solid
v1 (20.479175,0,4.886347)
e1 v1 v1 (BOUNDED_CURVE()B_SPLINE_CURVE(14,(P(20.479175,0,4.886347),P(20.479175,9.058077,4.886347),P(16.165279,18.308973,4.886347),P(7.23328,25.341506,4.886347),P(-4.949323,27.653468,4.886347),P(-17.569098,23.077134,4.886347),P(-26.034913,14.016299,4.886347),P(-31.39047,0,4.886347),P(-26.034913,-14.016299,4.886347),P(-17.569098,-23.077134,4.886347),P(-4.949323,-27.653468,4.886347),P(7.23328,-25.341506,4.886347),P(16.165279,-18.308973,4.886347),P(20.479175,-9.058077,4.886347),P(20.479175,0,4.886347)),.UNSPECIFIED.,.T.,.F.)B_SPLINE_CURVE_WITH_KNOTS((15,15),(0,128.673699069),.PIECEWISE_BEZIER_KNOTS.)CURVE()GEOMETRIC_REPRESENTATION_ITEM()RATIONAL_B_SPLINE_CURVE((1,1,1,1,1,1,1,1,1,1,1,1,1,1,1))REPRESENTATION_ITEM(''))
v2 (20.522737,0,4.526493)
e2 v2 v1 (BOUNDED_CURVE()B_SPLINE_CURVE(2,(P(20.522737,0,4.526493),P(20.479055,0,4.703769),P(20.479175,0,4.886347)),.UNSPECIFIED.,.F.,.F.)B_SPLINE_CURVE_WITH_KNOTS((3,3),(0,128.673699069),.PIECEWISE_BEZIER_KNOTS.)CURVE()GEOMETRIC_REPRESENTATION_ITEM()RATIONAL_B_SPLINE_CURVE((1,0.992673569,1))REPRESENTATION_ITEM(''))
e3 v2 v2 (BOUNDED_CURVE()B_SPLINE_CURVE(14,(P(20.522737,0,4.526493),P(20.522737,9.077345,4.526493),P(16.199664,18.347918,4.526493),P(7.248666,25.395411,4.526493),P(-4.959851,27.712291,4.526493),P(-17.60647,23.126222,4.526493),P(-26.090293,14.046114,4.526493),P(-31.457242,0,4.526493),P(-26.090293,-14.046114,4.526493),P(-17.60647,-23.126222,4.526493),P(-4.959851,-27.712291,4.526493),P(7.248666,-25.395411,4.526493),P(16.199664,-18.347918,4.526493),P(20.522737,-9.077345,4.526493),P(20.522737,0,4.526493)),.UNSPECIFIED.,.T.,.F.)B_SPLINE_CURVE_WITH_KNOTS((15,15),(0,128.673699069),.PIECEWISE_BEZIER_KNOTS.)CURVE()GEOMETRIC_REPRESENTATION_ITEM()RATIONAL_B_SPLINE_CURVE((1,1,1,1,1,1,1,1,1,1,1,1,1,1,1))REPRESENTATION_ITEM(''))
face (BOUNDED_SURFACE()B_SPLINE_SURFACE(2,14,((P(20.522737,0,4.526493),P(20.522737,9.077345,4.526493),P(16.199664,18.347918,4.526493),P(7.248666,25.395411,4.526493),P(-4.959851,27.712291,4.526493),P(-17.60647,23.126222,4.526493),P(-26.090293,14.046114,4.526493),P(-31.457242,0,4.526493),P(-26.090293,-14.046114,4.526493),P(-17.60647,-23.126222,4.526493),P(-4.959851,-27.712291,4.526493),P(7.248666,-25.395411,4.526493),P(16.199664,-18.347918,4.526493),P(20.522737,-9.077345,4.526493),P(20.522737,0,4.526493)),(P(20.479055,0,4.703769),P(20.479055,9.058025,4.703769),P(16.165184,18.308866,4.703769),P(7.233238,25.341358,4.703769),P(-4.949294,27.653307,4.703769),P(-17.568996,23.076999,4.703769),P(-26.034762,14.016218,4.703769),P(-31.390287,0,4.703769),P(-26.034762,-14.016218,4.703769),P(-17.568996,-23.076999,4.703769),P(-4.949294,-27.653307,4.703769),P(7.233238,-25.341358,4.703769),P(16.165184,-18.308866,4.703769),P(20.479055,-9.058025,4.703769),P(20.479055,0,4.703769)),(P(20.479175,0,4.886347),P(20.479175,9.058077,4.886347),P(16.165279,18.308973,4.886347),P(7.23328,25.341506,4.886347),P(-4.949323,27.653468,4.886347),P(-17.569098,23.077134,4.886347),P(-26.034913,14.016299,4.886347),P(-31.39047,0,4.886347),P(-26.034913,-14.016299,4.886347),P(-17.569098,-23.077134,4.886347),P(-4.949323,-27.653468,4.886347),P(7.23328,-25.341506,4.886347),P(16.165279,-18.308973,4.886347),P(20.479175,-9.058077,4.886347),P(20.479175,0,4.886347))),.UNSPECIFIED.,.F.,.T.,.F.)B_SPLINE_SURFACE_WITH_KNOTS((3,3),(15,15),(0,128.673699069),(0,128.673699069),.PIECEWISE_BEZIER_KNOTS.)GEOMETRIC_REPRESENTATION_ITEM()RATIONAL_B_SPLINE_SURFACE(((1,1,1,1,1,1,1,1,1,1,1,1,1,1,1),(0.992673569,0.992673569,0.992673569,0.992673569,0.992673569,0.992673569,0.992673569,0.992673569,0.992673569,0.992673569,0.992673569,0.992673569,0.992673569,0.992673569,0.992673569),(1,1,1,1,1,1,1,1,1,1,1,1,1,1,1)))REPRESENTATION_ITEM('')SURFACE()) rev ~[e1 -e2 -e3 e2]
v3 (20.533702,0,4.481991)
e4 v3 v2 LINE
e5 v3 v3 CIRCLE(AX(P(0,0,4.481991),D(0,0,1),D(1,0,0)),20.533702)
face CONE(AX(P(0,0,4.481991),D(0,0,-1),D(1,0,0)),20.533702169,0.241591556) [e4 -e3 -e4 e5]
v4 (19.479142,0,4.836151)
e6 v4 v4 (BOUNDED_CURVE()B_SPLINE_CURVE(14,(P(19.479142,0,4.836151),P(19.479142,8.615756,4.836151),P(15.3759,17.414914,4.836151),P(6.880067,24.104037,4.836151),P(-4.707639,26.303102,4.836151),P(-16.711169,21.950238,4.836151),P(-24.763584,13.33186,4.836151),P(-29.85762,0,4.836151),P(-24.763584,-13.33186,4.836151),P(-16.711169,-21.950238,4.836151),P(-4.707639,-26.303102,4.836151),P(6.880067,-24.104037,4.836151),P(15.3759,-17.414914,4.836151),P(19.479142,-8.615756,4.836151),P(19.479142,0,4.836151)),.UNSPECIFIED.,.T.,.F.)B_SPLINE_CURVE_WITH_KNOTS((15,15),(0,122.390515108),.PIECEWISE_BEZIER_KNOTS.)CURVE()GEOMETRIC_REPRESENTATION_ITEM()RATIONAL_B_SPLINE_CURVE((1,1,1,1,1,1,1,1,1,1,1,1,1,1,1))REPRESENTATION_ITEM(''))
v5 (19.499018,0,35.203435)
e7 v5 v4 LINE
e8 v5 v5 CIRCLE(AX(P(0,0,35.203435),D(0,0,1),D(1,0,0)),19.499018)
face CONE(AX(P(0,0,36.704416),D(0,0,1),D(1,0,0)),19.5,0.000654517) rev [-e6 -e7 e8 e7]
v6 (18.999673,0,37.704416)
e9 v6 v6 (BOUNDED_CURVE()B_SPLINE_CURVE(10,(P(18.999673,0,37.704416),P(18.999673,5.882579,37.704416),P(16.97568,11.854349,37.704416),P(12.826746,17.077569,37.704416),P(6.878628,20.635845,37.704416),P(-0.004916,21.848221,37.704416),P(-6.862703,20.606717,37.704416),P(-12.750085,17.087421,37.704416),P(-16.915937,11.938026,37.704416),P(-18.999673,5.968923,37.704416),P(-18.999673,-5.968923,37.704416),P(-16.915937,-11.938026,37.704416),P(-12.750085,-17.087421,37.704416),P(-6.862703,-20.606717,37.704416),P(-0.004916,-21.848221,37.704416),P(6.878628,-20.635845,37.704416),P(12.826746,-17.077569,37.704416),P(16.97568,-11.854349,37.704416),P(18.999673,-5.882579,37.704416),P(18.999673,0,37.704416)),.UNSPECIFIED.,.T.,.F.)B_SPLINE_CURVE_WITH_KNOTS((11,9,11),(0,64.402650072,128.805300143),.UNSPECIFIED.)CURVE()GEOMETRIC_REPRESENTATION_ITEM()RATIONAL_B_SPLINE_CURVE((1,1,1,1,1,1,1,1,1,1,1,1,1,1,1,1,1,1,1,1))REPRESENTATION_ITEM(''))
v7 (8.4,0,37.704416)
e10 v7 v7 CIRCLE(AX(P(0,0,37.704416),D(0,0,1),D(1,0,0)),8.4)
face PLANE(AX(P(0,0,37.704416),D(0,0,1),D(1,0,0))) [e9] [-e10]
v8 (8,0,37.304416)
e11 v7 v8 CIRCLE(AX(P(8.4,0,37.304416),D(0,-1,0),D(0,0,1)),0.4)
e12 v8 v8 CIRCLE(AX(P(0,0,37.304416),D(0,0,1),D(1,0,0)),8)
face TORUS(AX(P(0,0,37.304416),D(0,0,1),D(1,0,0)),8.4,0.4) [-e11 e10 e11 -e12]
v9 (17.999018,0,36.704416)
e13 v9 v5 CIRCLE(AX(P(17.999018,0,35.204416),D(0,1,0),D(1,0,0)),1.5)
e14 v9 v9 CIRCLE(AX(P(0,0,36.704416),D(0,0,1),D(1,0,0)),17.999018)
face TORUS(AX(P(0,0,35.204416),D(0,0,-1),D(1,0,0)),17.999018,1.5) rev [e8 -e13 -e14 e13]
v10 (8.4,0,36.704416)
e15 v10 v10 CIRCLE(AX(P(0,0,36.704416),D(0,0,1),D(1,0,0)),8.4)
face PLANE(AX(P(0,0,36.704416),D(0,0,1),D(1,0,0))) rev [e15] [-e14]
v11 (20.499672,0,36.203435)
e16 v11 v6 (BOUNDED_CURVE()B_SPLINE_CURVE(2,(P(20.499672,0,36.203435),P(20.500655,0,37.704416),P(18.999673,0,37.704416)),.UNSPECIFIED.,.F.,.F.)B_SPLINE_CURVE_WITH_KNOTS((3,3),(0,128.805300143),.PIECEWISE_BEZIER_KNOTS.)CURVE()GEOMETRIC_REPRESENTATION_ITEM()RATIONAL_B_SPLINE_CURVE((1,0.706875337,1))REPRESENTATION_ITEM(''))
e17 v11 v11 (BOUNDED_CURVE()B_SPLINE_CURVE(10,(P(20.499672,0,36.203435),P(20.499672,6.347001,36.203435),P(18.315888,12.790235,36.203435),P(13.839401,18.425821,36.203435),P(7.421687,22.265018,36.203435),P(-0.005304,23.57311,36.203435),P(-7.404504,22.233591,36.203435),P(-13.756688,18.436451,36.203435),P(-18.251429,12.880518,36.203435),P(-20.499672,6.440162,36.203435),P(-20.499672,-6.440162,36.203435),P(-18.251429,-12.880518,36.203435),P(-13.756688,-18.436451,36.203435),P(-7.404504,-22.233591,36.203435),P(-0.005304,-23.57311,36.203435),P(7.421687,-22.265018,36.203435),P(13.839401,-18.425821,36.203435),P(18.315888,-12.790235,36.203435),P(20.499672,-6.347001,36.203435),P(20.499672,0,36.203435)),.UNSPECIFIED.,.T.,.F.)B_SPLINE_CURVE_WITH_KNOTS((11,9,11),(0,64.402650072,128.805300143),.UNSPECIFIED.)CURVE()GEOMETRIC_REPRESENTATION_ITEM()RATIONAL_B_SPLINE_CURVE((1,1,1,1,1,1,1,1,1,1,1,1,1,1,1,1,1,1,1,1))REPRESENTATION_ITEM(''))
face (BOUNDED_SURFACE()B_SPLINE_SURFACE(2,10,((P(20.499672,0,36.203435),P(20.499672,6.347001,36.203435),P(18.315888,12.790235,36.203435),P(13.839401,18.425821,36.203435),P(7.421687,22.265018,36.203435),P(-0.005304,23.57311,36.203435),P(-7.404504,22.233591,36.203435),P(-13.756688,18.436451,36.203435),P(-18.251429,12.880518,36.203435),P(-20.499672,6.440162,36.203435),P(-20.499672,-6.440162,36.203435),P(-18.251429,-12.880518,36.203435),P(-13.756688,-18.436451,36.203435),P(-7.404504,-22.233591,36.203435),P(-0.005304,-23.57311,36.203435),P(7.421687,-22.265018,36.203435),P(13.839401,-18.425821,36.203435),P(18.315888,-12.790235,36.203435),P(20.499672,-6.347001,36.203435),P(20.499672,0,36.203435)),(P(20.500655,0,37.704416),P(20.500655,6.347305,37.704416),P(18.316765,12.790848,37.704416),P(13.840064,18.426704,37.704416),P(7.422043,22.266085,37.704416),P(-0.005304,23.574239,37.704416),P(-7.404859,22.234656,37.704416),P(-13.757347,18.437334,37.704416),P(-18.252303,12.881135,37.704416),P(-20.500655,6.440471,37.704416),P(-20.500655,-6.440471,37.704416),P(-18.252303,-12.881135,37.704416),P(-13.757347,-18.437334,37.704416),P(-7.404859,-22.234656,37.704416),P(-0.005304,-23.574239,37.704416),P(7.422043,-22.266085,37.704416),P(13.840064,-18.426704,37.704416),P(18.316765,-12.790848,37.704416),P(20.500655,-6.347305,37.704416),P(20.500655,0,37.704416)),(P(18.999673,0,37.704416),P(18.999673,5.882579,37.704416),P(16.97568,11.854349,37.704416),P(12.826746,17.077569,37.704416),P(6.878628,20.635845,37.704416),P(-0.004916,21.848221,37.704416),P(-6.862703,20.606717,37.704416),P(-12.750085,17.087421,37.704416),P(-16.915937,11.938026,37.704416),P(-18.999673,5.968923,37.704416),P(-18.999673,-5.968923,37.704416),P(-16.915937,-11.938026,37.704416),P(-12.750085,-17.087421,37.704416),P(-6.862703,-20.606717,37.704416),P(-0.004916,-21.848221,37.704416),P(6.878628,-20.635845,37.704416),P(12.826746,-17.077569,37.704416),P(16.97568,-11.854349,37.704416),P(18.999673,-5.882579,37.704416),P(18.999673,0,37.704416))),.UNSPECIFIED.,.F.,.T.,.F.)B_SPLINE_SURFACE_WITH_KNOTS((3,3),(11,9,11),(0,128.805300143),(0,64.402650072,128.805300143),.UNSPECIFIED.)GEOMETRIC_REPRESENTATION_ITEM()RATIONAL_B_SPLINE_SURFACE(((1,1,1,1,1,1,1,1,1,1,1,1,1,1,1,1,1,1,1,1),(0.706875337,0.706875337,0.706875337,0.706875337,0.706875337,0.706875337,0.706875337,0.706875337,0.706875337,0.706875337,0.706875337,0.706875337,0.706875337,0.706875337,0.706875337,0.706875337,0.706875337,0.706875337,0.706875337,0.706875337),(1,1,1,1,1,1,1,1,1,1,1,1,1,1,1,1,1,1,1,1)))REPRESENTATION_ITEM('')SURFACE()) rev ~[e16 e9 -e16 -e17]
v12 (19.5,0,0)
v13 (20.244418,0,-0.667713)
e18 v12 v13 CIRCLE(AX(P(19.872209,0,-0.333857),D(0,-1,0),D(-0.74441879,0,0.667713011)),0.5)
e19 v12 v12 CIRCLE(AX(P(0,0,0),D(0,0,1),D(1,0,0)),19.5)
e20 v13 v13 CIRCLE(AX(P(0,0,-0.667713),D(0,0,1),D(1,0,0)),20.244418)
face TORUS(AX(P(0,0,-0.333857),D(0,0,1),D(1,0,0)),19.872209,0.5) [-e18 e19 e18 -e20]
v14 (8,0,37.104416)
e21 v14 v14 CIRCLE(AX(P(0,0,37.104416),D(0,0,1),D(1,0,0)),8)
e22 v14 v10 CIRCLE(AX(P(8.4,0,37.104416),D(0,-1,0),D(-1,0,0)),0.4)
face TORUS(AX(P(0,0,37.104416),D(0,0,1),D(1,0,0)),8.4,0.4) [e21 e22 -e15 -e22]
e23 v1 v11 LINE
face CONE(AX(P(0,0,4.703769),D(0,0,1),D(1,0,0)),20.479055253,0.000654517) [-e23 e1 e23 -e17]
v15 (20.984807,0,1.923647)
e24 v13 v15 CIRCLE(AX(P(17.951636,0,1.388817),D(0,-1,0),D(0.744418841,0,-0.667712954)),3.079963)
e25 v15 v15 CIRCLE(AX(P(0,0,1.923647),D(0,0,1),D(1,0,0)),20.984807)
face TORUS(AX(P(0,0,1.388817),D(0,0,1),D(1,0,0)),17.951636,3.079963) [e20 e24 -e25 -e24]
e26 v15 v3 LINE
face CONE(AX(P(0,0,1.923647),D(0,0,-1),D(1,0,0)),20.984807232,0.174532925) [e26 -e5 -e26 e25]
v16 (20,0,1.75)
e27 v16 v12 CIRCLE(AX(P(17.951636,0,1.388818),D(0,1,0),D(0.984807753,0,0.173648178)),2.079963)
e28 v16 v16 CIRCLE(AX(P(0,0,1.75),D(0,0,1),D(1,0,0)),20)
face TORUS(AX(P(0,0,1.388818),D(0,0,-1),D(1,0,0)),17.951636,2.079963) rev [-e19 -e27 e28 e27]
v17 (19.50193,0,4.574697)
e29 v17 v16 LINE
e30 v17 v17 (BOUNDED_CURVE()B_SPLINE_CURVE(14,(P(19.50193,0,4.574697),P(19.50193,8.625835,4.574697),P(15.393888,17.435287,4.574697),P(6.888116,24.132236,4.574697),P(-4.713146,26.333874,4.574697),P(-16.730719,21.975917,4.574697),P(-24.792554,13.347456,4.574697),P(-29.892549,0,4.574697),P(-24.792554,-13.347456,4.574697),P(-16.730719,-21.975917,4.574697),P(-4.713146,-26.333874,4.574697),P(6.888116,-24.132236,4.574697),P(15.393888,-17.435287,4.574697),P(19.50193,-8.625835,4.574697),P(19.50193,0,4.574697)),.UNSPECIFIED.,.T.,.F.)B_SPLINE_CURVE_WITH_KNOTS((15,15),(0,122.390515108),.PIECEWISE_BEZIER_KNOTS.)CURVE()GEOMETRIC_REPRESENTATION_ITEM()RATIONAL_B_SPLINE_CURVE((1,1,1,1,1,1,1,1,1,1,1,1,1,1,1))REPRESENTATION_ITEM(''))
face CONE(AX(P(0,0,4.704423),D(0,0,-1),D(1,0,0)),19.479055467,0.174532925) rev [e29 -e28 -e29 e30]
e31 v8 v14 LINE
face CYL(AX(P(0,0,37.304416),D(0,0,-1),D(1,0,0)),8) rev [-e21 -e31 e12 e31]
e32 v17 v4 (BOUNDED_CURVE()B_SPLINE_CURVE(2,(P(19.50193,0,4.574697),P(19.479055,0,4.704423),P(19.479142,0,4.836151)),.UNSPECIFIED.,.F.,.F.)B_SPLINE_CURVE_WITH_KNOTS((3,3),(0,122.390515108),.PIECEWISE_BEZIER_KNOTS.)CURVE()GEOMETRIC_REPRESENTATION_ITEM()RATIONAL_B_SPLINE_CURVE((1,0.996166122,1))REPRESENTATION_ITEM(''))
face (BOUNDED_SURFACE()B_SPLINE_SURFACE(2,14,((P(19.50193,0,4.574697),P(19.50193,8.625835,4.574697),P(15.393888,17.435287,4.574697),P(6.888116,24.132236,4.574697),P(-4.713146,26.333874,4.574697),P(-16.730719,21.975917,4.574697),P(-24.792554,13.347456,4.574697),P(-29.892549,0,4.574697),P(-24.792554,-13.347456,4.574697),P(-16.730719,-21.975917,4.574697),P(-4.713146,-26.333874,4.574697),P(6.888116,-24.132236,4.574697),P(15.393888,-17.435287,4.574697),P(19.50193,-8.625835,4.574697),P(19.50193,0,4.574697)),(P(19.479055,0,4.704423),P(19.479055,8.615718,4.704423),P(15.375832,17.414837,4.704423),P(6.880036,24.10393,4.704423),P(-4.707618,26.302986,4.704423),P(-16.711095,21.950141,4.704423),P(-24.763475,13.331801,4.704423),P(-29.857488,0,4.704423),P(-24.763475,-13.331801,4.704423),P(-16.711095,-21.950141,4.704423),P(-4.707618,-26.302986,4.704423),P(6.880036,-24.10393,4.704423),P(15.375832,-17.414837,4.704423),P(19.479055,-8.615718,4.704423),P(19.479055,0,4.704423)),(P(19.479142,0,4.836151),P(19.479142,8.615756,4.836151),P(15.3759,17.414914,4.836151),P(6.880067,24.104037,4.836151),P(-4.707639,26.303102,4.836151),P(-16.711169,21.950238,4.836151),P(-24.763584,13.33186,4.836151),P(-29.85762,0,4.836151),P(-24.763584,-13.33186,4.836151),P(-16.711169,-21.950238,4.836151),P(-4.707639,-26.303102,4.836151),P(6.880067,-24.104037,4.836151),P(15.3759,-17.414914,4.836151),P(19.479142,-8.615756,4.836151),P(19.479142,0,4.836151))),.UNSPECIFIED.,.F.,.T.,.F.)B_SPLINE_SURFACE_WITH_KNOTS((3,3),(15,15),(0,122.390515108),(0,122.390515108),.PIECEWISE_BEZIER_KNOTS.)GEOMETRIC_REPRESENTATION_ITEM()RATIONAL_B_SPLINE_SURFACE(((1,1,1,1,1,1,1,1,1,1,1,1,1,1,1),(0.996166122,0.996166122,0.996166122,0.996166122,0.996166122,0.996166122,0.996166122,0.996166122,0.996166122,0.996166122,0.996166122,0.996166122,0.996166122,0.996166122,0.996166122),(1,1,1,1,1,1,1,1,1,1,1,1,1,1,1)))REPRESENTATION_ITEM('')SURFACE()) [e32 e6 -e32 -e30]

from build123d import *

# Parameters (mm, degrees)
F2_R = 1.5


# Not quite as in the source:
# - a feature names something its author has since deleted; it is built from what else it names


with BuildPart() as f1:
    # F0 (on Front) → F1 (revolve)
    with BuildSketch(Plane.XZ):
        with BuildLine():
            Line((19.479055467, 4.704423259), (20, 1.75))
            ThreePointArc((20, 1.75), (19.9515705454, 0.8174084156), (19.5, 0))
            ThreePointArc((19.5, 0), (19.5383526697, -0.7060657035), (20.2444183958, -0.6677134505))
            ThreePointArc((20.2444183958, -0.6677134505), (20.9130939683, 0.5426865853), (20.9848072317, 1.9236472929))
            Line((20.9848072317, 1.9236472929), (20.5337021691, 4.4819912332))
            Line((20.5337021691, 4.4819912332), (20.4790552528, 4.7037687424))
            Line((20.4790552528, 4.7037687424), (20.5000002142, 36.7044164045))
            Line((20.5000002142, 36.7044164048), (20.5000002142, 37.7044164048))
            Line((20.5000002142, 37.7044164048), (8.4, 37.7044164048))
            ThreePointArc((8.4, 37.7044164048), (8.1171572875, 37.5872591172), (8, 37.3044164048))
            Line((8, 37.3044164048), (8, 37.1044164048))
            ThreePointArc((8, 37.1044164048), (8.1171572875, 36.8215736923), (8.4, 36.7044164048))
            Line((8.4, 36.7044164048), (19.5, 36.7044164048))
            Line((19.5, 36.7044164048), (19.479055467, 4.704423259))
        make_face()
    revolve(axis=Axis((0, 0, 24.7507560998), (0, 0, 1)))

    # F2
    f2_edges = [f1.edges().sort_by_distance(p)[0] for p in [
        (-20.5, 0, 37.704416),
        (-19.5, 0, 36.704416),
        (-20.479055, 0, 4.703769),
        (-19.479055, 0, 4.704423),
    ]]
    fillet(f2_edges, radius=F2_R)


solid = f1.part
